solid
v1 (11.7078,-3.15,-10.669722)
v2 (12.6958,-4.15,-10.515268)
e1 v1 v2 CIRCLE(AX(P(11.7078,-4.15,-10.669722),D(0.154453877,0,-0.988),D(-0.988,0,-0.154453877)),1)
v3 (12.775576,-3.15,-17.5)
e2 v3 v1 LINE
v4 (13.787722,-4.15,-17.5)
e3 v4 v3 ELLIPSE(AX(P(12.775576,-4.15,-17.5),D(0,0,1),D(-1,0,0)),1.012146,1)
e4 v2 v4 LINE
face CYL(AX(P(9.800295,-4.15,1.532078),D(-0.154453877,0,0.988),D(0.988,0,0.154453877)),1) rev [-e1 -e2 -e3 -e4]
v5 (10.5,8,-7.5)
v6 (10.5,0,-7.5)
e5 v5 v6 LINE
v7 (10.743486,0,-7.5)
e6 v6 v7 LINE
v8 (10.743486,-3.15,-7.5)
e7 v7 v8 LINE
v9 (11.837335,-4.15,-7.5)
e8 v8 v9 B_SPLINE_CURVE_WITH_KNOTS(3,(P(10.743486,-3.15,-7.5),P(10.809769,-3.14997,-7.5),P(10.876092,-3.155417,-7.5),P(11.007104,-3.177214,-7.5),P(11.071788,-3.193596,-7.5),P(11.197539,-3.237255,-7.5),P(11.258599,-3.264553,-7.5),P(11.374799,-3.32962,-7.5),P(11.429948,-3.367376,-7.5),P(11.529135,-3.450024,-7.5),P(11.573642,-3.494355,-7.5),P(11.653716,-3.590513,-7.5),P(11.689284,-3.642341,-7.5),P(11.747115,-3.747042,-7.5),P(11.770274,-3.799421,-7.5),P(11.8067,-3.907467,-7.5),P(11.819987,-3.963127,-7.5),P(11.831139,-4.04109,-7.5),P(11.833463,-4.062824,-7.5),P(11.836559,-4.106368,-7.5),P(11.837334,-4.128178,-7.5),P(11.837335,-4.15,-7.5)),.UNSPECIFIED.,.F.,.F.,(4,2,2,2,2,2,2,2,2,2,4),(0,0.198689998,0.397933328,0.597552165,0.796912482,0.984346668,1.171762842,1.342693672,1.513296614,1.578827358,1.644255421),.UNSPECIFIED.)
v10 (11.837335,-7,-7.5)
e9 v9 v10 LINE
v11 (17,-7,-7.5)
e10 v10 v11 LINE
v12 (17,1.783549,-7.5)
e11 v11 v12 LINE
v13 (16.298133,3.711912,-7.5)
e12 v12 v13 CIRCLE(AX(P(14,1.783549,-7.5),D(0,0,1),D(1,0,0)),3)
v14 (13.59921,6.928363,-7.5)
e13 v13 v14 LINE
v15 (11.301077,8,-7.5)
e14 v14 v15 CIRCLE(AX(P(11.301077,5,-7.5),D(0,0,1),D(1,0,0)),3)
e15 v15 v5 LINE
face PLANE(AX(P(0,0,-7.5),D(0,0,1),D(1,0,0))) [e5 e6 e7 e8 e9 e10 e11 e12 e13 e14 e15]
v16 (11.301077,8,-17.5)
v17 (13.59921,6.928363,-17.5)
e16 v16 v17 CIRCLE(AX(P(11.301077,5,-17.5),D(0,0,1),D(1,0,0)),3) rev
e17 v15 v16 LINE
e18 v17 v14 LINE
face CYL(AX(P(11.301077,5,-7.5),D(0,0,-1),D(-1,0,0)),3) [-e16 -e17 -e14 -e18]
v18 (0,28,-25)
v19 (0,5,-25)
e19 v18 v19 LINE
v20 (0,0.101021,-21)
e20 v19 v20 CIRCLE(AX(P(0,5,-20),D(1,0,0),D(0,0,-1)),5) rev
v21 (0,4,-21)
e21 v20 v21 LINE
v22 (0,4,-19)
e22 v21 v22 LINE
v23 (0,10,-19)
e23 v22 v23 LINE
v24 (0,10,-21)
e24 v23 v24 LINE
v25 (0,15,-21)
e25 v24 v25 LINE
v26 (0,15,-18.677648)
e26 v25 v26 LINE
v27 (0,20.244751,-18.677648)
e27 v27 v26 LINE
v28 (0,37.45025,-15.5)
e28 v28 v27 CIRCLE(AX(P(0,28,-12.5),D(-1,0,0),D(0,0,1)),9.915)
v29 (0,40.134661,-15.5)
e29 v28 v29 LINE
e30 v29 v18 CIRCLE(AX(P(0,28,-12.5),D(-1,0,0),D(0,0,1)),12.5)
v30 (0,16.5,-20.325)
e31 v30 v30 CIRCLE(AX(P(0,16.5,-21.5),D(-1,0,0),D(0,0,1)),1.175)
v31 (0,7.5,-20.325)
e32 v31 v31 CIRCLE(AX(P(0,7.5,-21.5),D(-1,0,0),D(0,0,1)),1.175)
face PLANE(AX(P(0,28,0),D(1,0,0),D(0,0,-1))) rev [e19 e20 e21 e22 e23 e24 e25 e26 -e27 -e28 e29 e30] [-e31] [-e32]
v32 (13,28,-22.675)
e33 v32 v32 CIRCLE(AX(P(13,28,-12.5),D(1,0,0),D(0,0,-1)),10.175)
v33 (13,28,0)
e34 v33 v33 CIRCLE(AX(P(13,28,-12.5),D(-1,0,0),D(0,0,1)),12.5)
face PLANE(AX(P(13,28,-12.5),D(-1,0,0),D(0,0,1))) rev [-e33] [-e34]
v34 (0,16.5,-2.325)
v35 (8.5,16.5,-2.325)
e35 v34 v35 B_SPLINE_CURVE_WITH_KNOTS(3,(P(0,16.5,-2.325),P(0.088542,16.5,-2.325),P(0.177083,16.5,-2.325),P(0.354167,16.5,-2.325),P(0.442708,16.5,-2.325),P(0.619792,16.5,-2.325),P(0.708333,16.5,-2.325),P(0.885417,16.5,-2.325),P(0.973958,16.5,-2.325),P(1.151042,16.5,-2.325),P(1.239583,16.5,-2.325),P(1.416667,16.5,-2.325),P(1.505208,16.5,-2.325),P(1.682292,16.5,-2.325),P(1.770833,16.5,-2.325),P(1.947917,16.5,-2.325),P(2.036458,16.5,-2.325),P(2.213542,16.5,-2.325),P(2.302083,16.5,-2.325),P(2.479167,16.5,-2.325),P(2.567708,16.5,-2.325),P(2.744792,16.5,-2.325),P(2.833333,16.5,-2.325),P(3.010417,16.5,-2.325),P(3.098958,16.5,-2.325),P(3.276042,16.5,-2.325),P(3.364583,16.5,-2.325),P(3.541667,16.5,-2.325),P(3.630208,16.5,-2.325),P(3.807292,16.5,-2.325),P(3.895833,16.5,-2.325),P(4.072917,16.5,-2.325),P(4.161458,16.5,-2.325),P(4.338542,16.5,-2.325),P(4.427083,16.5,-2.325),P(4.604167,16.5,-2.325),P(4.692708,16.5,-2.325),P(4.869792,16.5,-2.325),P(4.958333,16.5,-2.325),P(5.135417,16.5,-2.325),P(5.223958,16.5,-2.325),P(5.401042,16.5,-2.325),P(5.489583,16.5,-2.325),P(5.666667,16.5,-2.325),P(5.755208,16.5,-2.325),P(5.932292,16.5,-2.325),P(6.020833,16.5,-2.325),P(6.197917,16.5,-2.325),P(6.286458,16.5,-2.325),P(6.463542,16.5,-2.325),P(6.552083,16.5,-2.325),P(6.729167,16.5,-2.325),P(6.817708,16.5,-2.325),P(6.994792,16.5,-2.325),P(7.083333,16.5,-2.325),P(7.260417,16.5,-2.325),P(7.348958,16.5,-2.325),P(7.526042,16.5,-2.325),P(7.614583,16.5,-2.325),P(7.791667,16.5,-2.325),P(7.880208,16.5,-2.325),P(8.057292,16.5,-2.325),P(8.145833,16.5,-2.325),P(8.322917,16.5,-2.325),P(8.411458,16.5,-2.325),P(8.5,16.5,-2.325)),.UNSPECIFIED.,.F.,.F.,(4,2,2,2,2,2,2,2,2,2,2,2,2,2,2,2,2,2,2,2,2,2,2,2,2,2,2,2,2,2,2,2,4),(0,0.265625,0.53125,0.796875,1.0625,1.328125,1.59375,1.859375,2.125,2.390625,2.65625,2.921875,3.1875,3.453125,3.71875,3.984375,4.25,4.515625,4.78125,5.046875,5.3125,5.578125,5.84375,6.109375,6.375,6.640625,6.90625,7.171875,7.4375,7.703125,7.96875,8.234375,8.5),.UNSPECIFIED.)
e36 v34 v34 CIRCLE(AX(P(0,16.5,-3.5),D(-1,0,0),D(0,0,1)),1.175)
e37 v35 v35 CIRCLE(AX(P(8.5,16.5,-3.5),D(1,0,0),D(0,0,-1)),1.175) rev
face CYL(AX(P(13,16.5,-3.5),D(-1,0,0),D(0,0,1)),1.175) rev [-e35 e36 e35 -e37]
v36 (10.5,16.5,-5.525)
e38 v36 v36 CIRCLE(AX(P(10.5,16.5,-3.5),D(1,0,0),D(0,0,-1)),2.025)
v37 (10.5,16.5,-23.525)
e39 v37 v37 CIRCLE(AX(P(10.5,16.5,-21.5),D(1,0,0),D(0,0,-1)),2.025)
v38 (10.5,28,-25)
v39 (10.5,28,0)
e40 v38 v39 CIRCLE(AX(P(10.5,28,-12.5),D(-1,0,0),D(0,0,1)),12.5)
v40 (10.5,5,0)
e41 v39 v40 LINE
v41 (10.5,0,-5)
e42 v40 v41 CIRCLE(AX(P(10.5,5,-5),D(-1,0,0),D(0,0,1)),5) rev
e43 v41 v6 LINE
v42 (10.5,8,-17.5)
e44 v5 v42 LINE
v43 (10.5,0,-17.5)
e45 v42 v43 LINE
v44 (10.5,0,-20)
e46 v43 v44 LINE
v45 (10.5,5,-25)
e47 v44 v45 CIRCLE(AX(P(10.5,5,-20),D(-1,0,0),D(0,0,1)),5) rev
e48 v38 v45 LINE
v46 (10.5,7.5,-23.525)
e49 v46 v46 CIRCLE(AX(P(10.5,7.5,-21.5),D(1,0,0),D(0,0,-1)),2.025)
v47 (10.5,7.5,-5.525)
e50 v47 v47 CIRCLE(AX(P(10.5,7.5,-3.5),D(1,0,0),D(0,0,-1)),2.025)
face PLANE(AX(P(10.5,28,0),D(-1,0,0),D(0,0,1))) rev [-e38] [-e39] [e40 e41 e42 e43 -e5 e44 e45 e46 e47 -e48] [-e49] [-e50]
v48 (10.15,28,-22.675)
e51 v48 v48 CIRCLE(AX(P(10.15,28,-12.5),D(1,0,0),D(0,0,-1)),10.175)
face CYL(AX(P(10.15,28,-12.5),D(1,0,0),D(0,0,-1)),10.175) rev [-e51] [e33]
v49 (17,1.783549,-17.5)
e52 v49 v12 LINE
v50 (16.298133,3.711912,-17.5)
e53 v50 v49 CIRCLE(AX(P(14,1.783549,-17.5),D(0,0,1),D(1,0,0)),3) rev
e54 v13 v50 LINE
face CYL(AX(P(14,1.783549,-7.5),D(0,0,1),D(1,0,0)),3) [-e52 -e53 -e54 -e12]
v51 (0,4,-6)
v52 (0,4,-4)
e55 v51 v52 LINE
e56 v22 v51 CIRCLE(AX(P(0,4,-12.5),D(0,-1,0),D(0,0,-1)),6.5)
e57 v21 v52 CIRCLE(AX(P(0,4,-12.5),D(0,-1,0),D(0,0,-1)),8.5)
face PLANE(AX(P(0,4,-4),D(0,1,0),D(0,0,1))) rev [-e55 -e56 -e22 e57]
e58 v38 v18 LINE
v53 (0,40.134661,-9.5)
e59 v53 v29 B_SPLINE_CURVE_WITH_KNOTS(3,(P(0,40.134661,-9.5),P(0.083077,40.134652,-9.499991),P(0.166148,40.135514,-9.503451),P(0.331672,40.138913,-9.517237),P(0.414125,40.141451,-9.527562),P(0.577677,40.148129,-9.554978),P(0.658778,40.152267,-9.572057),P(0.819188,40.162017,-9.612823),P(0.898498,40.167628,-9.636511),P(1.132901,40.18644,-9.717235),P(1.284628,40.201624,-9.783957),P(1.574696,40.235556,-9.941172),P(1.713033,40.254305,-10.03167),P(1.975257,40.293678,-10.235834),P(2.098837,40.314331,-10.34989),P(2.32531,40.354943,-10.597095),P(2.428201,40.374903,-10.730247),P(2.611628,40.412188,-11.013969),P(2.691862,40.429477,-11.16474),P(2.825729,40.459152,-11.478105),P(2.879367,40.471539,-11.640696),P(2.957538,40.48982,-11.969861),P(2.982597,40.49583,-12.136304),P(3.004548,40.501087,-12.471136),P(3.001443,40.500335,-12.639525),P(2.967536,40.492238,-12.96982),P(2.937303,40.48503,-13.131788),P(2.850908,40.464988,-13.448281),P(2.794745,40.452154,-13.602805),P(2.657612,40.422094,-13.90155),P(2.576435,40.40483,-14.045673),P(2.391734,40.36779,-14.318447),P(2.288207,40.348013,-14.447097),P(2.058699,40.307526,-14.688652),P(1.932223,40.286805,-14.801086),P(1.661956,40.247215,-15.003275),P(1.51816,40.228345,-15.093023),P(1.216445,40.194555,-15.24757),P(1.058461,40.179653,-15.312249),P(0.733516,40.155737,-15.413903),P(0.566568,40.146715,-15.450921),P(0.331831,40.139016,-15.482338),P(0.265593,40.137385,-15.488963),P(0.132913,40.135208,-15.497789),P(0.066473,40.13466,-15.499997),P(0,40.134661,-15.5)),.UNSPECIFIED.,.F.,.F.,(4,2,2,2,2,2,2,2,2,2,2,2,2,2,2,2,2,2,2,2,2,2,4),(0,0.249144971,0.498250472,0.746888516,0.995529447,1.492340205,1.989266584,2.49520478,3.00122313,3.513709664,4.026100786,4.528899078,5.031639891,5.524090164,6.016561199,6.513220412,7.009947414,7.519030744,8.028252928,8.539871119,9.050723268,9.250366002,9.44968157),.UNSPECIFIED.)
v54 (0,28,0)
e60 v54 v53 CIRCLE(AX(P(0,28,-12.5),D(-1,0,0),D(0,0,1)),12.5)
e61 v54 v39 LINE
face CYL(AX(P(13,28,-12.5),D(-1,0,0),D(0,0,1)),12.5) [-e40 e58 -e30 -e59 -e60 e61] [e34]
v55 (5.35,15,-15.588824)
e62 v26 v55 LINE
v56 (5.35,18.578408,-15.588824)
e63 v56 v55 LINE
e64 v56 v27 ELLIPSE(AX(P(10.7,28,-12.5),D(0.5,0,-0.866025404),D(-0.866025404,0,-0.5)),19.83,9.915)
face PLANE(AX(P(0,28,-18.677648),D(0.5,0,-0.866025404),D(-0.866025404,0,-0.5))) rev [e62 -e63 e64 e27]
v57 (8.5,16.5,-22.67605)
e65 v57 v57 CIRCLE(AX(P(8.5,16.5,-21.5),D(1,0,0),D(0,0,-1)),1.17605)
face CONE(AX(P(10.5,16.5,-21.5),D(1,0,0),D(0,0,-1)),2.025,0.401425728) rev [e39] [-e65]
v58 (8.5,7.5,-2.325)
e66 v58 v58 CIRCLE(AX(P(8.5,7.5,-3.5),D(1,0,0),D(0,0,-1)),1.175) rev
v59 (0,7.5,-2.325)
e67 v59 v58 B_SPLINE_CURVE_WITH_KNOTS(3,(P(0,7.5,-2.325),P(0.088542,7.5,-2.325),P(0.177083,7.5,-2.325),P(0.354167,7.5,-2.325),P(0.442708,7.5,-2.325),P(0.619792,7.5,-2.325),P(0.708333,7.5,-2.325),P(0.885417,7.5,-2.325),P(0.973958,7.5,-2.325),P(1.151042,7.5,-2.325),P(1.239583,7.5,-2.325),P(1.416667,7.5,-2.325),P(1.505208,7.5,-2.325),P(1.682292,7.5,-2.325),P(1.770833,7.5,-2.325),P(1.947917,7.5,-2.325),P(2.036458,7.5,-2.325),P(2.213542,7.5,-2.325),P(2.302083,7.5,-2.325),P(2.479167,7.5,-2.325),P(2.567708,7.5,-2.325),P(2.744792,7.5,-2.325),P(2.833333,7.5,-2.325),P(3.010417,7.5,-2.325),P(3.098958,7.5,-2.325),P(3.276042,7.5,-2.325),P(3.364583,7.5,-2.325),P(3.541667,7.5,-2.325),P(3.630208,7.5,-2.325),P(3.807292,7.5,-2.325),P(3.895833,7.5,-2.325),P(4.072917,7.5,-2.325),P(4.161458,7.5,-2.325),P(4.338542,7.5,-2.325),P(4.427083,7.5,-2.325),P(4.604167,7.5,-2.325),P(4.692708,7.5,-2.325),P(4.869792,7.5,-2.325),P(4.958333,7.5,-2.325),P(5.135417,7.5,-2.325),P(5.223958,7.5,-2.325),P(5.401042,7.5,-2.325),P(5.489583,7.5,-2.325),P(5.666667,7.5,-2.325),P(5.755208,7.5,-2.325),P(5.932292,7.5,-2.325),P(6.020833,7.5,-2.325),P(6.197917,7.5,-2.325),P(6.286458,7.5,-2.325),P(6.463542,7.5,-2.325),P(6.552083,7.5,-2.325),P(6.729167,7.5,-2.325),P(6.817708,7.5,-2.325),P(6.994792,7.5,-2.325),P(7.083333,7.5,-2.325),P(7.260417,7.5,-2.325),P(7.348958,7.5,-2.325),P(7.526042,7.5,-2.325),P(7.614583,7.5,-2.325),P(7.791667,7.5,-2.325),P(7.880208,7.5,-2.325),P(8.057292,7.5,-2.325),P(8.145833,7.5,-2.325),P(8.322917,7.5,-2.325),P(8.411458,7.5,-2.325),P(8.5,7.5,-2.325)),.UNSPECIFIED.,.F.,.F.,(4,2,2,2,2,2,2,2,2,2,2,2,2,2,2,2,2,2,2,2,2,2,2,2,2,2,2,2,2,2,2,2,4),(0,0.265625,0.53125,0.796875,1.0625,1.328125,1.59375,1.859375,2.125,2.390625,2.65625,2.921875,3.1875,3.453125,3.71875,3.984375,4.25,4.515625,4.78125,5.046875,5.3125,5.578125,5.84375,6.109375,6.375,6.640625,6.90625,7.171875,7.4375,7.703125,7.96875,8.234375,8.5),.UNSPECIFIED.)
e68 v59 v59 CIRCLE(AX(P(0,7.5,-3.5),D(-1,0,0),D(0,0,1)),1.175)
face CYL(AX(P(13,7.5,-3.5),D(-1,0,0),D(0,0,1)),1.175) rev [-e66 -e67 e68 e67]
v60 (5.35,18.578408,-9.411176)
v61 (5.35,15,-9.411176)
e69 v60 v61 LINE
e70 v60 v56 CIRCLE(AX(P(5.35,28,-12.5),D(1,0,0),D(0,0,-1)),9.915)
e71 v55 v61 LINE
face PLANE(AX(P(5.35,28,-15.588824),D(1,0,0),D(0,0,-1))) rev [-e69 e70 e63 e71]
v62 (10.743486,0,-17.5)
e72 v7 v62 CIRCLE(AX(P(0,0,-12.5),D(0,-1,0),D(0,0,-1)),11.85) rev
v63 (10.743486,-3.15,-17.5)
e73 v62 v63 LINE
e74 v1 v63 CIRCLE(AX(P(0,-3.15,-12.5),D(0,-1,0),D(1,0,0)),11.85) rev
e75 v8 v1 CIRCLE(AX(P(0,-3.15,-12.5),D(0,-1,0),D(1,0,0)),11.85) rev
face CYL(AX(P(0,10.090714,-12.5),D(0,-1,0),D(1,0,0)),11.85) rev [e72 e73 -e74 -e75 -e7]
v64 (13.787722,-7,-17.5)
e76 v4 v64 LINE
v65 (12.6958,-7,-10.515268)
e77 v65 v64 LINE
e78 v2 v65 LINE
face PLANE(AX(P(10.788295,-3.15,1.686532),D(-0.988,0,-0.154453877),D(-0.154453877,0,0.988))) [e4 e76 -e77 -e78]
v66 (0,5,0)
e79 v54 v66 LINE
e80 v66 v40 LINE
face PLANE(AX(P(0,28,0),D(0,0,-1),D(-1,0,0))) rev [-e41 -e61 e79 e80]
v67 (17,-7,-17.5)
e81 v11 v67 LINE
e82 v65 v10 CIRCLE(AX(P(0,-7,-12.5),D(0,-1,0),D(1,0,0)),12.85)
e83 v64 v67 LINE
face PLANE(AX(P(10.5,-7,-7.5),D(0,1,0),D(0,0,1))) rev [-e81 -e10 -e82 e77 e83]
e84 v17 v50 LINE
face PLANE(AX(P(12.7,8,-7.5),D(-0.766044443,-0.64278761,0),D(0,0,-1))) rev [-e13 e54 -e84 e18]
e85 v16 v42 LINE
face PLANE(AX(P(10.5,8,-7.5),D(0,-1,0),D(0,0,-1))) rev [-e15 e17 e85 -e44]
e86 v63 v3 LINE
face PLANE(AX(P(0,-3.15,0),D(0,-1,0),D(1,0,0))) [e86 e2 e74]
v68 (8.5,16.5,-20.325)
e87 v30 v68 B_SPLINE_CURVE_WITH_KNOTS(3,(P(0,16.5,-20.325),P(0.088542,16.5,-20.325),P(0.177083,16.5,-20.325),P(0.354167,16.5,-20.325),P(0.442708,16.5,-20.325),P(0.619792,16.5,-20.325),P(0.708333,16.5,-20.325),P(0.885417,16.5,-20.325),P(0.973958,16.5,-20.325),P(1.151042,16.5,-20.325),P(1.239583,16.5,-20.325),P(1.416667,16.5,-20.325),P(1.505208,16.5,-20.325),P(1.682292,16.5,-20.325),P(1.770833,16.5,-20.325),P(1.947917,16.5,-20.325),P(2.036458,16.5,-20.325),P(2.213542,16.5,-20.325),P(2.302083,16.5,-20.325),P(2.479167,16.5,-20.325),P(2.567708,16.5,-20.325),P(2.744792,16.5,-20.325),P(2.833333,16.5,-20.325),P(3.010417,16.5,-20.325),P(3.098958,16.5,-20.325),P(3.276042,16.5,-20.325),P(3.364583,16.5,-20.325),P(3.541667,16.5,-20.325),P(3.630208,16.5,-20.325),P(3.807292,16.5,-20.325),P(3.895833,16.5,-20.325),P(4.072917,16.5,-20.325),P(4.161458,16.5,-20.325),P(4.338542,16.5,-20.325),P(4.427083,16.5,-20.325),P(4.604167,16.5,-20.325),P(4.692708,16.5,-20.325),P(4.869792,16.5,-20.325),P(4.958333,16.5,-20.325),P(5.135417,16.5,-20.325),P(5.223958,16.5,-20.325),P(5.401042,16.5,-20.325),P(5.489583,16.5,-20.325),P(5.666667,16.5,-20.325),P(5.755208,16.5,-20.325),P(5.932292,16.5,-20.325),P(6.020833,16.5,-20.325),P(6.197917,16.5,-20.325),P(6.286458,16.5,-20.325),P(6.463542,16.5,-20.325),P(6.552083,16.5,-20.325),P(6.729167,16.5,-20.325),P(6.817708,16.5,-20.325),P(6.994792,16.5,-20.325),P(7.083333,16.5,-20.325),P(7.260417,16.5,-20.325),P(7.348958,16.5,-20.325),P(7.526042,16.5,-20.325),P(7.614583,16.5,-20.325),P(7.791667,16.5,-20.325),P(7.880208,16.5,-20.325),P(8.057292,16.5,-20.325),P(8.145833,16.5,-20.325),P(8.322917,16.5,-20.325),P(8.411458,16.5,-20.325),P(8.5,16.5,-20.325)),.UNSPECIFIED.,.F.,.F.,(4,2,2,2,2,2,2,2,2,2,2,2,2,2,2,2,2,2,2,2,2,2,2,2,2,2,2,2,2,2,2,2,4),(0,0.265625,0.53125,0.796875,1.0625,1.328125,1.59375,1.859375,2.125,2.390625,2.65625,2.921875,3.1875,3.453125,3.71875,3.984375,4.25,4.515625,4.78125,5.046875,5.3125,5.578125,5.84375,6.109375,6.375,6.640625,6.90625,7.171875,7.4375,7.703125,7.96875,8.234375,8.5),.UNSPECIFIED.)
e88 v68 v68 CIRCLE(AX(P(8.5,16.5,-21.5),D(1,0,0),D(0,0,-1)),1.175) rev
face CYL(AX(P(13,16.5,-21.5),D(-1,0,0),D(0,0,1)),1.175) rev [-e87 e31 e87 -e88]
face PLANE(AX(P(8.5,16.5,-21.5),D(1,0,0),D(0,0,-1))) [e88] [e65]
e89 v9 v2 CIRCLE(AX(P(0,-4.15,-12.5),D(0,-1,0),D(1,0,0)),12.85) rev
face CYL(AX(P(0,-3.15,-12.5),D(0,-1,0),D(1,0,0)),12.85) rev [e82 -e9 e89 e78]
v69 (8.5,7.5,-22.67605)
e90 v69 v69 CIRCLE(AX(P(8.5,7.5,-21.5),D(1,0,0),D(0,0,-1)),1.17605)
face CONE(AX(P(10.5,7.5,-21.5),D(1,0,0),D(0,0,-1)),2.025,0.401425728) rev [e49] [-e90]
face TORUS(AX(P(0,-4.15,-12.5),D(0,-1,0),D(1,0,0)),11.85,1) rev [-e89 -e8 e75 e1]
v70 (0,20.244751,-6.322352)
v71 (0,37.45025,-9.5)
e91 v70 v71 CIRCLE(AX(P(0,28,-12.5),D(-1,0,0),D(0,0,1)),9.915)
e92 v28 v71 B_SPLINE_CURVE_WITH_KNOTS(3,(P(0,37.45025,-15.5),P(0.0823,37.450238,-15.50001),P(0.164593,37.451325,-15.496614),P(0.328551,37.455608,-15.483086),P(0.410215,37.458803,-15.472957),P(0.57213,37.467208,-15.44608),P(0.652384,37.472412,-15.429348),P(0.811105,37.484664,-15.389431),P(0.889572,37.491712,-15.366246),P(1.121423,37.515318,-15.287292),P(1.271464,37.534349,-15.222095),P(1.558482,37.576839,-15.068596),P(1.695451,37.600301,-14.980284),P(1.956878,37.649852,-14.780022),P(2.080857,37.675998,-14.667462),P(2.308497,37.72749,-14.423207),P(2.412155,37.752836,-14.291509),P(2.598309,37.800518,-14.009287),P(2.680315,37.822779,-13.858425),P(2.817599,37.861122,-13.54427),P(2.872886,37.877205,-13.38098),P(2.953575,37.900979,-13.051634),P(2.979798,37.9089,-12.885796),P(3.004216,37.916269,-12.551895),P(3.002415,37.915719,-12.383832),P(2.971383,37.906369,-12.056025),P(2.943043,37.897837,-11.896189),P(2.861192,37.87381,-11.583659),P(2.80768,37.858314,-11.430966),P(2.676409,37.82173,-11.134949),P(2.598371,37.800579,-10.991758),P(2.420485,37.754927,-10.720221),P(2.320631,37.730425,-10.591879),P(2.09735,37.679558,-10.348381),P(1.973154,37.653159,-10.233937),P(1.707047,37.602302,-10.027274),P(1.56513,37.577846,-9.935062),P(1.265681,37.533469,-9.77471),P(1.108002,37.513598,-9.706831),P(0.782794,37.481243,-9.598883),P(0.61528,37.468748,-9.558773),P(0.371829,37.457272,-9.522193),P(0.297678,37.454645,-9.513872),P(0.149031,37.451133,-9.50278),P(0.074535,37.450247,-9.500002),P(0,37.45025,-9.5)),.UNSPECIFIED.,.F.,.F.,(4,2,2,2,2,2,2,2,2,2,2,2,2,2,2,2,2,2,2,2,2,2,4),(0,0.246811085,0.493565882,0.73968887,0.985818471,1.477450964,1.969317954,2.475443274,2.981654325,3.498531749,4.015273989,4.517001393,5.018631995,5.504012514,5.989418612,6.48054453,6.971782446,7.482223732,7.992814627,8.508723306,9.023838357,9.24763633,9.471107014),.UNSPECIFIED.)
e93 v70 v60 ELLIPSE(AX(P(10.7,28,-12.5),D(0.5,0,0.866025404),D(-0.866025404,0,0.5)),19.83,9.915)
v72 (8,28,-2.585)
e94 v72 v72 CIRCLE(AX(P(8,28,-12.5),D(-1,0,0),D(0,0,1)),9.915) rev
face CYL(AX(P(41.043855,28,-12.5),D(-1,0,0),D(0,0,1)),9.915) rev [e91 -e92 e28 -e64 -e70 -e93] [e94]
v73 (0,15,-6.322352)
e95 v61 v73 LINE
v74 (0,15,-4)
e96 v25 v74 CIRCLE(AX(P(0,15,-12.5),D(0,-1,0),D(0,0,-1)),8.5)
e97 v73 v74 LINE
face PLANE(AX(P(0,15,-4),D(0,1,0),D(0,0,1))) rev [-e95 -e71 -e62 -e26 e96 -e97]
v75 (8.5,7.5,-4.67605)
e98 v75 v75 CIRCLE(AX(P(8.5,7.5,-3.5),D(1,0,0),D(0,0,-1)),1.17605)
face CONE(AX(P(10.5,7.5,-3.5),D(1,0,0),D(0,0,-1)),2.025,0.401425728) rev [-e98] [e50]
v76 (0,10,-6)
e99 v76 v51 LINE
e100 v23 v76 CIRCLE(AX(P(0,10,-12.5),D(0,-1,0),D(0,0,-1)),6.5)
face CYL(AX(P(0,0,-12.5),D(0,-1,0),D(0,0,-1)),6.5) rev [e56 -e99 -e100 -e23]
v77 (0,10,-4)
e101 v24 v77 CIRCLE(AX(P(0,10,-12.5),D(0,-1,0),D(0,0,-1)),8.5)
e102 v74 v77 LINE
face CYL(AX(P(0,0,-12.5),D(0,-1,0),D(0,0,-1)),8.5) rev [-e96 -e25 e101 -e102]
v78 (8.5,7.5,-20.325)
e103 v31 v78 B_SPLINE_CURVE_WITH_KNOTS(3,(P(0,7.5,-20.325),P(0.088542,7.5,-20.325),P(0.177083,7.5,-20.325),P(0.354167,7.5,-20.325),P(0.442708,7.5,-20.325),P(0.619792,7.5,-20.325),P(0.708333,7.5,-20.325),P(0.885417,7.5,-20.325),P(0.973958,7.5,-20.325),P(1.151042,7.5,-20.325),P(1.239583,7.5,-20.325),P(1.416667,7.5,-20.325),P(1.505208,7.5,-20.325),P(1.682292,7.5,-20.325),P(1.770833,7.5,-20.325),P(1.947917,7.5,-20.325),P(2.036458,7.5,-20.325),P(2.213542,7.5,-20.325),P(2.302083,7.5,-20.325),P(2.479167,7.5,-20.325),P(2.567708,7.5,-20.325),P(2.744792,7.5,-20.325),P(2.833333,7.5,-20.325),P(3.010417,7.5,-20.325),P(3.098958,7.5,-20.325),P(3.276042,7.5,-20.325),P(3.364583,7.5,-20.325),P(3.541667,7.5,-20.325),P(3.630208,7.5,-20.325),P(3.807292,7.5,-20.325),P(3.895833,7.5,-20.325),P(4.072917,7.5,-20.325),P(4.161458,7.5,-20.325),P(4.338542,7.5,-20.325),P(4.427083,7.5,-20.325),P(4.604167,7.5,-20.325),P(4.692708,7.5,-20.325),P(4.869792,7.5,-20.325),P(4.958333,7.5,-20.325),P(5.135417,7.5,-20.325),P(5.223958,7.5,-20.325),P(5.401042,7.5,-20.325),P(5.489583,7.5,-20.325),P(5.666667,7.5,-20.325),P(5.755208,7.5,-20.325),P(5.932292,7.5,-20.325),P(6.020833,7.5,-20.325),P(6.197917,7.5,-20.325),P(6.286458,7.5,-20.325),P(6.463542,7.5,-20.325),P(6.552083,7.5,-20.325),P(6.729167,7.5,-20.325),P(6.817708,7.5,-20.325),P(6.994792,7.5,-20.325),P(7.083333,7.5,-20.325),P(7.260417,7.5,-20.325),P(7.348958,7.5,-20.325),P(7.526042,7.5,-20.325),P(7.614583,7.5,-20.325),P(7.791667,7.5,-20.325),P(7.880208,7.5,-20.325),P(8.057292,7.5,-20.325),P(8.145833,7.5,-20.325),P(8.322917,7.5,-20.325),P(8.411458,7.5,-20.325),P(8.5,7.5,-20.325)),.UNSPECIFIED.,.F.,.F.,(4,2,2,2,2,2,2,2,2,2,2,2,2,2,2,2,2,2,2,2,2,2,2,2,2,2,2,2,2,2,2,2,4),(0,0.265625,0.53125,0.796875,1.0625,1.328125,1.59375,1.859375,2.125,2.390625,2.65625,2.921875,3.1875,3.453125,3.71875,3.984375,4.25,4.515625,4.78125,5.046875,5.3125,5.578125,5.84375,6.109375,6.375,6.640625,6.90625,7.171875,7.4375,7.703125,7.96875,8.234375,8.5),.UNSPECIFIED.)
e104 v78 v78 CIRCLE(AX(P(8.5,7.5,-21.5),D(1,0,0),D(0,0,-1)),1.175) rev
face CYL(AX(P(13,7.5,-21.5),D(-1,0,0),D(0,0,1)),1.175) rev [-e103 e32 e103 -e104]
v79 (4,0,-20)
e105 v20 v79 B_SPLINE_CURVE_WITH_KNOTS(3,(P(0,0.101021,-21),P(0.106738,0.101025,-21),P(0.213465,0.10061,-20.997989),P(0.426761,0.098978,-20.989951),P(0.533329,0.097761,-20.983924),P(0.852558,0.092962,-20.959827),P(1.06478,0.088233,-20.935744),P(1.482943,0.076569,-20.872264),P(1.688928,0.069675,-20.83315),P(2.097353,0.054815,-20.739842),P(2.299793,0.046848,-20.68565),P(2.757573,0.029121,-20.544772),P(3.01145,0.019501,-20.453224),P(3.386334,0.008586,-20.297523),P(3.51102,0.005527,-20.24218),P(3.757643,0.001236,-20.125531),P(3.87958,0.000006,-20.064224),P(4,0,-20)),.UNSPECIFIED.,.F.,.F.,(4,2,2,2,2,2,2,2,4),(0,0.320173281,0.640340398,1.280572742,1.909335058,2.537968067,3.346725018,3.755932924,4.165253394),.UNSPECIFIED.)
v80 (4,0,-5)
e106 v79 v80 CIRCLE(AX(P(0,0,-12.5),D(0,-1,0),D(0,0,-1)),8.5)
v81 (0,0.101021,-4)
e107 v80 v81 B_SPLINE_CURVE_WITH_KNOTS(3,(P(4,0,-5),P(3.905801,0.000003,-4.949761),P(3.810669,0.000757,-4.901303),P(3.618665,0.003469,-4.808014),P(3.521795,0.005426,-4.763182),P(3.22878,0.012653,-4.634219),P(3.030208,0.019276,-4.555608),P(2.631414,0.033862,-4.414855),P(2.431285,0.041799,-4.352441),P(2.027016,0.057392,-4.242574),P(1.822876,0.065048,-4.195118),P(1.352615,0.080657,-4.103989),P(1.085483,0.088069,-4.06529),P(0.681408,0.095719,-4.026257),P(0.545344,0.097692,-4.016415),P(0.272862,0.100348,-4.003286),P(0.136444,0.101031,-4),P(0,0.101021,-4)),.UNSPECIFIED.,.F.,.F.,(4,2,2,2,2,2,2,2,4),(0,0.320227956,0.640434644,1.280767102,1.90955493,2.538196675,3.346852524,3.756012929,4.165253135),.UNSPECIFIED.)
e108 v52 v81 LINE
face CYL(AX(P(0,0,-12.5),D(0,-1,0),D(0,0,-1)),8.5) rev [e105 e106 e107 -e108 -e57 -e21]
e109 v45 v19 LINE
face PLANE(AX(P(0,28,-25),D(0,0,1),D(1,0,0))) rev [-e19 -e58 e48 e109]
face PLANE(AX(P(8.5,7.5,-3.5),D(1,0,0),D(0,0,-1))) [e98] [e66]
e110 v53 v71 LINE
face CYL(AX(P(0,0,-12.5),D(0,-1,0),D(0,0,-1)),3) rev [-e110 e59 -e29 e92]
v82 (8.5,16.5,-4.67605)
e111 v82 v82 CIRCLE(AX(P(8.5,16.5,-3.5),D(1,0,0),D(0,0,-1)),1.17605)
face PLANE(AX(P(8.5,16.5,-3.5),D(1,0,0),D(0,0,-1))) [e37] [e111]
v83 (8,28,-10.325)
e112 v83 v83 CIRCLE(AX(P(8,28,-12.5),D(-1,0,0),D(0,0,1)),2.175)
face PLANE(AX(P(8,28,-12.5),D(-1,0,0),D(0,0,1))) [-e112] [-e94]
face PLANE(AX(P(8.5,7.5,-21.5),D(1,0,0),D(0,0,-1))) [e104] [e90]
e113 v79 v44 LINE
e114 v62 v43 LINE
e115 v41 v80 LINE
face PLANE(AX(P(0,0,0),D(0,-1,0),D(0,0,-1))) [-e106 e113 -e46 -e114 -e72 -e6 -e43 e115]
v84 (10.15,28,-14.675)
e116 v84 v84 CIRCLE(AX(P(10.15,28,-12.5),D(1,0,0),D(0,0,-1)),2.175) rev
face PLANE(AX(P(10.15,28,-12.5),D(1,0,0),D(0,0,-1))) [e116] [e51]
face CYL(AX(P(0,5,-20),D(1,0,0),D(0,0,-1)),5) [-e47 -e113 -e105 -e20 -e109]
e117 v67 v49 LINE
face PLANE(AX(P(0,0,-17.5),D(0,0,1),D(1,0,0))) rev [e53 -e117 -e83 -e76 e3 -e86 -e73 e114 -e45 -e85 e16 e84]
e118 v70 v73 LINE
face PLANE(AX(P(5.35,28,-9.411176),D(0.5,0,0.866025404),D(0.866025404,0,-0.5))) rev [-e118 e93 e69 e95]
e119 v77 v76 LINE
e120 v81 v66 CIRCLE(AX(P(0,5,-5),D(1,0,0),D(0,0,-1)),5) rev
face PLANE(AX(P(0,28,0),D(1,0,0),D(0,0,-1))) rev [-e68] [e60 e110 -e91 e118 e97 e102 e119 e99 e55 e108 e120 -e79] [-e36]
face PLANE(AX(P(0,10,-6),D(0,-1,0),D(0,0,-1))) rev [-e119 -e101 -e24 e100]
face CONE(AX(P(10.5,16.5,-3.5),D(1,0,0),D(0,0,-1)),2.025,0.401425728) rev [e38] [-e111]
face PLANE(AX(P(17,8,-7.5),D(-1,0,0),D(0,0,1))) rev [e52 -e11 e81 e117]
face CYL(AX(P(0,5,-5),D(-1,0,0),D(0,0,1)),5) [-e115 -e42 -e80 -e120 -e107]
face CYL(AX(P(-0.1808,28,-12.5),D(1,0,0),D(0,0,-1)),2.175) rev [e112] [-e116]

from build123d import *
from build123d.topology import SkipClean

# Parameters (mm, degrees)
CROQUIS1_W                       = 10.5
CROQUIS1_H                       = 25
SALIENTE_EXTRUIR1_DEPTH          = 28
CROQUIS2_R                       = 12.5
SALIENTE_EXTRUIR2_DEPTH          = 13
REDONDEO1_START                  = -1
REDONDEO1_DEPTH                  = 12
CORTAR_EXTRUIR1_DEPTH            = 13
CROQUIS5_R                       = 9.915
CORTAR_EXTRUIR2_DEPTH            = 8
CROQUIS8_R                       = 1.175
CORTAR_EXTRUIR5_DEPTH            = 50.338119296
CROQUIS10_W                      = 6.5
CROQUIS10_H                      = 15
SALIENTE_EXTRUIR3_DEPTH          = 5
CORTAR_EXTRUIR6_DEPTH            = 7
CORTAR_EXTRUIR7_DEPTH            = 3.85
CHAFL_N1_SIZE                    = 4.3
CHAFL_N1_SIZE2                   = 5.124540448
REDONDEO2_R                      = 1
REDONDEO3_R                      = 3
CORTAR_EXTRUIR8_START            = -2.5
CORTAR_EXTRUIR8_DEPTH            = 2.5
CROQUIS14_R                      = 3.6
CORTAR_EXTRUIR9_DEPTH            = 49.739101502
CROQUIS15_R                      = 2.025
CORTAR_EXTRUIR10_DEPTH           = 2
CORTAR_EXTRUIR10_DRAFT           = -23
CORTAR_EXTRUIR10_PROFILE_2_DEPTH = 2
CORTAR_EXTRUIR10_PROFILE_2_DRAFT = -23
CORTAR_EXTRUIR10_PROFILE_3_DEPTH = 2
CORTAR_EXTRUIR10_PROFILE_3_DRAFT = -23
CORTAR_EXTRUIR10_PROFILE_4_DEPTH = 2
CORTAR_EXTRUIR10_PROFILE_4_DRAFT = -23
CROQUIS16_R                      = 3.6
SALIENTE_EXTRUIR4_DEPTH          = 2.5
CROQUIS17_R                      = 12.5
SALIENTE_EXTRUIR5_DEPTH          = 2.5
CROQUIS18_R                      = 2.175
CORTAR_EXTRUIR11_DEPTH           = 50.338119296
CROQUIS19_R                      = 10.175
CORTAR_EXTRUIR12_DEPTH           = 2.85


with BuildPart() as part:
    # Croquis1 → Saliente-Extruir1 (new body)
    with BuildSketch(Plane(origin=(0, 0, 0), x_dir=(1, 0, 0), z_dir=(0, 1, 0))):
        with Locations((5.25, 12.5)):
            Rectangle(CROQUIS1_W, CROQUIS1_H)
    extrude(amount=SALIENTE_EXTRUIR1_DEPTH)

    # Croquis2 → Saliente-Extruir2 (add)
    with BuildSketch(Plane.ZY):
        with Locations((-12.5, 28)):
            Circle(CROQUIS2_R)
    extrude(amount=-SALIENTE_EXTRUIR2_DEPTH)

    # Croquis3 → Cortar-Revolución1 (revolve, cut)
    with BuildSketch(Plane.ZY):
        Polygon((-4, 0.5), (-4, 4), (-6, 4), (-6, 10), (-4, 10), (-4, 15), (-9.5, 15), (-9.5, 41), (-12.5, 41), (-12.5, 0), (-4, 0), align=None)
    revolve(axis=Axis((0, 0, -12.5), (0, 1, 0)), mode=Mode.SUBTRACT)

    # Redondeo1: read off the stored shape, not the designer's step
    # Redondeo1 outline → Redondeo1 (cut)
    with BuildSketch(Plane.YZ.offset(REDONDEO1_START)):
        with BuildLine():
            Line((0, 0), (0, -5))
            ThreePointArc((0, -5), (1.464466094, -1.464466094), (5, 0))
            Line((5, 0), (0, 0))
        make_face()
        with BuildLine():
            ThreePointArc((5, -25), (1.464466094, -23.535533906), (0, -20))
            Line((0, -20), (0, -25))
            Line((0, -25), (5, -25))
        make_face()
    extrude(amount=REDONDEO1_DEPTH, mode=Mode.SUBTRACT)

    # Croquis4 → Cortar-Extruir1 (cut)
    with BuildSketch(Plane.XZ.offset(-15)):
        Polygon((0, -18.67764788), (5.35, -15.58882394), (5.35, -9.41117606), (0, -6.32235212), (-5.35, -9.41117606), (-5.35, -15.58882394), align=None)
    extrude(amount=-CORTAR_EXTRUIR1_DEPTH, mode=Mode.SUBTRACT)

    # Croquis5 → Cortar-Extruir2 (cut)
    with BuildSketch(Plane.ZY):
        with Locations((-12.5, 28)):
            Circle(CROQUIS5_R)
    extrude(amount=-CORTAR_EXTRUIR2_DEPTH, mode=Mode.SUBTRACT)

    # Croquis8 → Cortar-Extruir5 (cut, through all)
    with BuildSketch(Plane.ZY):
        with Locations((-21.5, 16.5)):
            Circle(CROQUIS8_R)
        with Locations((-3.5, 16.5)):
            Circle(CROQUIS8_R)
        with Locations((-3.5, 7.5)):
            Circle(CROQUIS8_R)
        with Locations((-21.5, 7.5)):
            Circle(CROQUIS8_R)
    extrude(amount=-CORTAR_EXTRUIR5_DEPTH, mode=Mode.SUBTRACT)

    # Croquis10 → Saliente-Extruir3 (add, symmetric)
    with BuildSketch(Plane.XY.offset(-12.5)):
        with Locations((13.75, 0.5)):
            Rectangle(CROQUIS10_W, CROQUIS10_H)
    extrude(amount=SALIENTE_EXTRUIR3_DEPTH, both=True)

    # Croquis11 → Cortar-Extruir6 (cut)
    with BuildSketch(Plane.XZ.offset(7)):
        with BuildLine():
            Line((10.5, -17.5), (10.743486399, -17.5))
            ThreePointArc((10.743486399, -17.5), (11.85, -12.5), (10.743486399, -7.5))
            Line((10.743486399, -7.5), (10.5, -7.5))
            Line((10.5, -7.5), (10.5, -17.5))
        make_face()
    extrude(amount=-CORTAR_EXTRUIR6_DEPTH, mode=Mode.SUBTRACT)

    # Croquis12 → Cortar-Extruir7 (cut)
    with BuildSketch(Plane.XZ.offset(7)):
        with BuildLine():
            ThreePointArc((10.743486399, -7.5), (11.85, -12.5), (10.743486399, -17.5))
            Line((10.743486399, -17.5), (13.787722048, -17.5))
            Line((13.787722048, -17.5), (12.6958, -10.515267686))
            ThreePointArc((12.6958, -10.515267686), (12.358868803, -8.981355103), (11.837335004, -7.5))
            Line((11.837335004, -7.5), (10.743486399, -7.5))
        make_face()
    extrude(amount=-CORTAR_EXTRUIR7_DEPTH, mode=Mode.SUBTRACT)

    # Chaflán1
    chafl_n1_edges = [part.edges().sort_by_distance(p)[0] for p in [
        (17, 8, -12.5),
    ]]
    chafl_n1_side = [part.faces().sort_by_distance(p)[0] for p in [
        (13.75, 8, -12.5),
    ]]
    chamfer(chafl_n1_edges, length=CHAFL_N1_SIZE, length2=CHAFL_N1_SIZE2, reference=chafl_n1_side[0])

    # Redondeo2
    redondeo2_edges = [part.edges().sort_by_distance(p)[0] for p in [
        (12.358868803, -3.15, -8.981355103),
        (13.241761024, -3.15, -14.007633843),
    ]]
    fillet(redondeo2_edges, radius=REDONDEO2_R - 0.0001)  # a hair under: the kernel refuses the full size

    # Redondeo3
    redondeo3_edges = [part.edges().sort_by_distance(p)[0] for p in [
        (12.7, 8, -12.5),
        (17, 2.875459552, -12.5),
    ]]
    fillet(redondeo3_edges, radius=REDONDEO3_R)

    # Croquis13 → Cortar-Extruir8 (cut)
    with BuildSketch(Plane(origin=(13, 0, 0), x_dir=(0, 0, -1), z_dir=(1, 0, 0)).offset(CORTAR_EXTRUIR8_START)):
        with BuildLine():
            ThreePointArc((9.860236176, 30.44778409), (8.9, 28), (9.860236176, 25.55221591))
            Line((9.860236176, 25.55221591), (10.393008213, 15.678856157))
            ThreePointArc((10.393008213, 15.678856157), (12.51082596, 15.500004688), (14.628330733, 15.682524273))
            Line((14.628330733, 15.682524273), (15.272384177, 25.703505721))
            ThreePointArc((15.272384177, 25.703505721), (16.1, 28), (15.272384177, 30.296494279))
            Line((15.272384177, 30.296494279), (14.628330733, 40.317475727))
            ThreePointArc((14.628330733, 40.317475727), (12.51082596, 40.499995312), (10.393008213, 40.321143843))
            Line((10.393008213, 40.321143843), (9.860236176, 30.44778409))
        make_face()
    extrude(amount=CORTAR_EXTRUIR8_DEPTH, mode=Mode.SUBTRACT)

    # Croquis14 → Cortar-Extruir9 (cut, through all)
    with SkipClean():  # the faces are left unmerged after this step: merging them gives an invalid solid
        with BuildSketch(Plane(origin=(10.5, 0, 0), x_dir=(0, 0, -1), z_dir=(1, 0, 0))):
            with Locations(Location((12.5, 28, 0), (0, 0, 39.636527191))):
                Circle(CROQUIS14_R)
        extrude(amount=-CORTAR_EXTRUIR9_DEPTH, mode=Mode.SUBTRACT)


with BuildPart() as cortar_extruir10_tool:
    # Croquis15 → Cortar-Extruir10 (with draft: the straight prism first)
    with BuildSketch(Plane(origin=(10.5, 0, 0), x_dir=(0, 0, -1), z_dir=(1, 0, 0))):
        with Locations((3.5, 16.5)):
            Circle(CROQUIS15_R)
    extrude(amount=-CORTAR_EXTRUIR10_DEPTH)
    # Cortar-Extruir10: the draft: its side faces are tilted about the plane it starts from
    cortar_extruir10_sides = [cortar_extruir10_tool.faces().sort_by_distance(p)[0] for p in [
        (9.5, 16.5, -1.475),
    ]]
    draft(cortar_extruir10_sides, Plane(origin=(10.5, 0, 0), x_dir=(0, 0, -1), z_dir=(1, 0, 0)), CORTAR_EXTRUIR10_DRAFT)


with BuildPart() as part_1:
    add(part.part)

    # Cortar-Extruir10: cut by cortar_extruir10_tool
    add(cortar_extruir10_tool.part, mode=Mode.SUBTRACT)


with BuildPart() as cortar_extruir10_profile_2_tool:
    # Croquis15 → Cortar-Extruir10 profile 2 (with draft: the straight prism first)
    with BuildSketch(Plane(origin=(10.5, 0, 0), x_dir=(0, 0, -1), z_dir=(1, 0, 0))):
        with Locations((3.5, 7.5)):
            Circle(CROQUIS15_R)
    extrude(amount=-CORTAR_EXTRUIR10_PROFILE_2_DEPTH)
    # Cortar-Extruir10 profile 2: the draft: its side faces are tilted about the plane it starts from
    cortar_extruir10_profile_2_sides = [cortar_extruir10_profile_2_tool.faces().sort_by_distance(p)[0] for p in [
        (9.5, 7.5, -1.475),
    ]]
    draft(cortar_extruir10_profile_2_sides, Plane(origin=(10.5, 0, 0), x_dir=(0, 0, -1), z_dir=(1, 0, 0)), CORTAR_EXTRUIR10_PROFILE_2_DRAFT)


with BuildPart() as part_2:
    add(part_1.part)

    # Cortar-Extruir10 profile 2: cut by cortar_extruir10_profile_2_tool
    add(cortar_extruir10_profile_2_tool.part, mode=Mode.SUBTRACT)


with BuildPart() as cortar_extruir10_profile_3_tool:
    # Croquis15 → Cortar-Extruir10 profile 3 (with draft: the straight prism first)
    with BuildSketch(Plane(origin=(10.5, 0, 0), x_dir=(0, 0, -1), z_dir=(1, 0, 0))):
        with Locations((21.5, 7.5)):
            Circle(CROQUIS15_R)
    extrude(amount=-CORTAR_EXTRUIR10_PROFILE_3_DEPTH)
    # Cortar-Extruir10 profile 3: the draft: its side faces are tilted about the plane it starts from
    cortar_extruir10_profile_3_sides = [cortar_extruir10_profile_3_tool.faces().sort_by_distance(p)[0] for p in [
        (9.5, 7.5, -19.475),
    ]]
    draft(cortar_extruir10_profile_3_sides, Plane(origin=(10.5, 0, 0), x_dir=(0, 0, -1), z_dir=(1, 0, 0)), CORTAR_EXTRUIR10_PROFILE_3_DRAFT)


with BuildPart() as part_3:
    add(part_2.part)

    # Cortar-Extruir10 profile 3: cut by cortar_extruir10_profile_3_tool
    add(cortar_extruir10_profile_3_tool.part, mode=Mode.SUBTRACT)


with BuildPart() as cortar_extruir10_profile_4_tool:
    # Croquis15 → Cortar-Extruir10 profile 4 (with draft: the straight prism first)
    with BuildSketch(Plane(origin=(10.5, 0, 0), x_dir=(0, 0, -1), z_dir=(1, 0, 0))):
        with Locations((21.5, 16.5)):
            Circle(CROQUIS15_R)
    extrude(amount=-CORTAR_EXTRUIR10_PROFILE_4_DEPTH)
    # Cortar-Extruir10 profile 4: the draft: its side faces are tilted about the plane it starts from
    cortar_extruir10_profile_4_sides = [cortar_extruir10_profile_4_tool.faces().sort_by_distance(p)[0] for p in [
        (9.5, 16.5, -19.475),
    ]]
    draft(cortar_extruir10_profile_4_sides, Plane(origin=(10.5, 0, 0), x_dir=(0, 0, -1), z_dir=(1, 0, 0)), CORTAR_EXTRUIR10_PROFILE_4_DRAFT)


with BuildPart() as part_4:
    add(part_3.part)

    # Cortar-Extruir10 profile 4: cut by cortar_extruir10_profile_4_tool
    add(cortar_extruir10_profile_4_tool.part, mode=Mode.SUBTRACT)

    # Croquis16 → Saliente-Extruir4 (add)
    with BuildSketch(Plane.ZY.offset(-8)):
        with Locations((-12.5, 28)):
            Circle(CROQUIS16_R)
    extrude(amount=-SALIENTE_EXTRUIR4_DEPTH)

    # Croquis17 → Saliente-Extruir5 (add)
    with BuildSketch(Plane(origin=(10.5, 0, 0), x_dir=(0, 0, -1), z_dir=(1, 0, 0))):
        with Locations(Location((12.5, 28, 0), (0, 0, 180))):
            Circle(CROQUIS17_R)
    extrude(amount=SALIENTE_EXTRUIR5_DEPTH)

    # Croquis18 → Cortar-Extruir11 (cut, through all)
    with BuildSketch(Plane(origin=(13, 0, 0), x_dir=(0, 0, -1), z_dir=(1, 0, 0))):
        with Locations((12.5, 28)):
            Circle(CROQUIS18_R)
    extrude(amount=-CORTAR_EXTRUIR11_DEPTH, mode=Mode.SUBTRACT)

    # Croquis19 → Cortar-Extruir12 (cut)
    with BuildSketch(Plane(origin=(13, 0, 0), x_dir=(0, 0, -1), z_dir=(1, 0, 0))):
        with Locations((12.5, 28)):
            Circle(CROQUIS19_R)
    extrude(amount=-CORTAR_EXTRUIR12_DEPTH, mode=Mode.SUBTRACT)


solid = part_4.part
